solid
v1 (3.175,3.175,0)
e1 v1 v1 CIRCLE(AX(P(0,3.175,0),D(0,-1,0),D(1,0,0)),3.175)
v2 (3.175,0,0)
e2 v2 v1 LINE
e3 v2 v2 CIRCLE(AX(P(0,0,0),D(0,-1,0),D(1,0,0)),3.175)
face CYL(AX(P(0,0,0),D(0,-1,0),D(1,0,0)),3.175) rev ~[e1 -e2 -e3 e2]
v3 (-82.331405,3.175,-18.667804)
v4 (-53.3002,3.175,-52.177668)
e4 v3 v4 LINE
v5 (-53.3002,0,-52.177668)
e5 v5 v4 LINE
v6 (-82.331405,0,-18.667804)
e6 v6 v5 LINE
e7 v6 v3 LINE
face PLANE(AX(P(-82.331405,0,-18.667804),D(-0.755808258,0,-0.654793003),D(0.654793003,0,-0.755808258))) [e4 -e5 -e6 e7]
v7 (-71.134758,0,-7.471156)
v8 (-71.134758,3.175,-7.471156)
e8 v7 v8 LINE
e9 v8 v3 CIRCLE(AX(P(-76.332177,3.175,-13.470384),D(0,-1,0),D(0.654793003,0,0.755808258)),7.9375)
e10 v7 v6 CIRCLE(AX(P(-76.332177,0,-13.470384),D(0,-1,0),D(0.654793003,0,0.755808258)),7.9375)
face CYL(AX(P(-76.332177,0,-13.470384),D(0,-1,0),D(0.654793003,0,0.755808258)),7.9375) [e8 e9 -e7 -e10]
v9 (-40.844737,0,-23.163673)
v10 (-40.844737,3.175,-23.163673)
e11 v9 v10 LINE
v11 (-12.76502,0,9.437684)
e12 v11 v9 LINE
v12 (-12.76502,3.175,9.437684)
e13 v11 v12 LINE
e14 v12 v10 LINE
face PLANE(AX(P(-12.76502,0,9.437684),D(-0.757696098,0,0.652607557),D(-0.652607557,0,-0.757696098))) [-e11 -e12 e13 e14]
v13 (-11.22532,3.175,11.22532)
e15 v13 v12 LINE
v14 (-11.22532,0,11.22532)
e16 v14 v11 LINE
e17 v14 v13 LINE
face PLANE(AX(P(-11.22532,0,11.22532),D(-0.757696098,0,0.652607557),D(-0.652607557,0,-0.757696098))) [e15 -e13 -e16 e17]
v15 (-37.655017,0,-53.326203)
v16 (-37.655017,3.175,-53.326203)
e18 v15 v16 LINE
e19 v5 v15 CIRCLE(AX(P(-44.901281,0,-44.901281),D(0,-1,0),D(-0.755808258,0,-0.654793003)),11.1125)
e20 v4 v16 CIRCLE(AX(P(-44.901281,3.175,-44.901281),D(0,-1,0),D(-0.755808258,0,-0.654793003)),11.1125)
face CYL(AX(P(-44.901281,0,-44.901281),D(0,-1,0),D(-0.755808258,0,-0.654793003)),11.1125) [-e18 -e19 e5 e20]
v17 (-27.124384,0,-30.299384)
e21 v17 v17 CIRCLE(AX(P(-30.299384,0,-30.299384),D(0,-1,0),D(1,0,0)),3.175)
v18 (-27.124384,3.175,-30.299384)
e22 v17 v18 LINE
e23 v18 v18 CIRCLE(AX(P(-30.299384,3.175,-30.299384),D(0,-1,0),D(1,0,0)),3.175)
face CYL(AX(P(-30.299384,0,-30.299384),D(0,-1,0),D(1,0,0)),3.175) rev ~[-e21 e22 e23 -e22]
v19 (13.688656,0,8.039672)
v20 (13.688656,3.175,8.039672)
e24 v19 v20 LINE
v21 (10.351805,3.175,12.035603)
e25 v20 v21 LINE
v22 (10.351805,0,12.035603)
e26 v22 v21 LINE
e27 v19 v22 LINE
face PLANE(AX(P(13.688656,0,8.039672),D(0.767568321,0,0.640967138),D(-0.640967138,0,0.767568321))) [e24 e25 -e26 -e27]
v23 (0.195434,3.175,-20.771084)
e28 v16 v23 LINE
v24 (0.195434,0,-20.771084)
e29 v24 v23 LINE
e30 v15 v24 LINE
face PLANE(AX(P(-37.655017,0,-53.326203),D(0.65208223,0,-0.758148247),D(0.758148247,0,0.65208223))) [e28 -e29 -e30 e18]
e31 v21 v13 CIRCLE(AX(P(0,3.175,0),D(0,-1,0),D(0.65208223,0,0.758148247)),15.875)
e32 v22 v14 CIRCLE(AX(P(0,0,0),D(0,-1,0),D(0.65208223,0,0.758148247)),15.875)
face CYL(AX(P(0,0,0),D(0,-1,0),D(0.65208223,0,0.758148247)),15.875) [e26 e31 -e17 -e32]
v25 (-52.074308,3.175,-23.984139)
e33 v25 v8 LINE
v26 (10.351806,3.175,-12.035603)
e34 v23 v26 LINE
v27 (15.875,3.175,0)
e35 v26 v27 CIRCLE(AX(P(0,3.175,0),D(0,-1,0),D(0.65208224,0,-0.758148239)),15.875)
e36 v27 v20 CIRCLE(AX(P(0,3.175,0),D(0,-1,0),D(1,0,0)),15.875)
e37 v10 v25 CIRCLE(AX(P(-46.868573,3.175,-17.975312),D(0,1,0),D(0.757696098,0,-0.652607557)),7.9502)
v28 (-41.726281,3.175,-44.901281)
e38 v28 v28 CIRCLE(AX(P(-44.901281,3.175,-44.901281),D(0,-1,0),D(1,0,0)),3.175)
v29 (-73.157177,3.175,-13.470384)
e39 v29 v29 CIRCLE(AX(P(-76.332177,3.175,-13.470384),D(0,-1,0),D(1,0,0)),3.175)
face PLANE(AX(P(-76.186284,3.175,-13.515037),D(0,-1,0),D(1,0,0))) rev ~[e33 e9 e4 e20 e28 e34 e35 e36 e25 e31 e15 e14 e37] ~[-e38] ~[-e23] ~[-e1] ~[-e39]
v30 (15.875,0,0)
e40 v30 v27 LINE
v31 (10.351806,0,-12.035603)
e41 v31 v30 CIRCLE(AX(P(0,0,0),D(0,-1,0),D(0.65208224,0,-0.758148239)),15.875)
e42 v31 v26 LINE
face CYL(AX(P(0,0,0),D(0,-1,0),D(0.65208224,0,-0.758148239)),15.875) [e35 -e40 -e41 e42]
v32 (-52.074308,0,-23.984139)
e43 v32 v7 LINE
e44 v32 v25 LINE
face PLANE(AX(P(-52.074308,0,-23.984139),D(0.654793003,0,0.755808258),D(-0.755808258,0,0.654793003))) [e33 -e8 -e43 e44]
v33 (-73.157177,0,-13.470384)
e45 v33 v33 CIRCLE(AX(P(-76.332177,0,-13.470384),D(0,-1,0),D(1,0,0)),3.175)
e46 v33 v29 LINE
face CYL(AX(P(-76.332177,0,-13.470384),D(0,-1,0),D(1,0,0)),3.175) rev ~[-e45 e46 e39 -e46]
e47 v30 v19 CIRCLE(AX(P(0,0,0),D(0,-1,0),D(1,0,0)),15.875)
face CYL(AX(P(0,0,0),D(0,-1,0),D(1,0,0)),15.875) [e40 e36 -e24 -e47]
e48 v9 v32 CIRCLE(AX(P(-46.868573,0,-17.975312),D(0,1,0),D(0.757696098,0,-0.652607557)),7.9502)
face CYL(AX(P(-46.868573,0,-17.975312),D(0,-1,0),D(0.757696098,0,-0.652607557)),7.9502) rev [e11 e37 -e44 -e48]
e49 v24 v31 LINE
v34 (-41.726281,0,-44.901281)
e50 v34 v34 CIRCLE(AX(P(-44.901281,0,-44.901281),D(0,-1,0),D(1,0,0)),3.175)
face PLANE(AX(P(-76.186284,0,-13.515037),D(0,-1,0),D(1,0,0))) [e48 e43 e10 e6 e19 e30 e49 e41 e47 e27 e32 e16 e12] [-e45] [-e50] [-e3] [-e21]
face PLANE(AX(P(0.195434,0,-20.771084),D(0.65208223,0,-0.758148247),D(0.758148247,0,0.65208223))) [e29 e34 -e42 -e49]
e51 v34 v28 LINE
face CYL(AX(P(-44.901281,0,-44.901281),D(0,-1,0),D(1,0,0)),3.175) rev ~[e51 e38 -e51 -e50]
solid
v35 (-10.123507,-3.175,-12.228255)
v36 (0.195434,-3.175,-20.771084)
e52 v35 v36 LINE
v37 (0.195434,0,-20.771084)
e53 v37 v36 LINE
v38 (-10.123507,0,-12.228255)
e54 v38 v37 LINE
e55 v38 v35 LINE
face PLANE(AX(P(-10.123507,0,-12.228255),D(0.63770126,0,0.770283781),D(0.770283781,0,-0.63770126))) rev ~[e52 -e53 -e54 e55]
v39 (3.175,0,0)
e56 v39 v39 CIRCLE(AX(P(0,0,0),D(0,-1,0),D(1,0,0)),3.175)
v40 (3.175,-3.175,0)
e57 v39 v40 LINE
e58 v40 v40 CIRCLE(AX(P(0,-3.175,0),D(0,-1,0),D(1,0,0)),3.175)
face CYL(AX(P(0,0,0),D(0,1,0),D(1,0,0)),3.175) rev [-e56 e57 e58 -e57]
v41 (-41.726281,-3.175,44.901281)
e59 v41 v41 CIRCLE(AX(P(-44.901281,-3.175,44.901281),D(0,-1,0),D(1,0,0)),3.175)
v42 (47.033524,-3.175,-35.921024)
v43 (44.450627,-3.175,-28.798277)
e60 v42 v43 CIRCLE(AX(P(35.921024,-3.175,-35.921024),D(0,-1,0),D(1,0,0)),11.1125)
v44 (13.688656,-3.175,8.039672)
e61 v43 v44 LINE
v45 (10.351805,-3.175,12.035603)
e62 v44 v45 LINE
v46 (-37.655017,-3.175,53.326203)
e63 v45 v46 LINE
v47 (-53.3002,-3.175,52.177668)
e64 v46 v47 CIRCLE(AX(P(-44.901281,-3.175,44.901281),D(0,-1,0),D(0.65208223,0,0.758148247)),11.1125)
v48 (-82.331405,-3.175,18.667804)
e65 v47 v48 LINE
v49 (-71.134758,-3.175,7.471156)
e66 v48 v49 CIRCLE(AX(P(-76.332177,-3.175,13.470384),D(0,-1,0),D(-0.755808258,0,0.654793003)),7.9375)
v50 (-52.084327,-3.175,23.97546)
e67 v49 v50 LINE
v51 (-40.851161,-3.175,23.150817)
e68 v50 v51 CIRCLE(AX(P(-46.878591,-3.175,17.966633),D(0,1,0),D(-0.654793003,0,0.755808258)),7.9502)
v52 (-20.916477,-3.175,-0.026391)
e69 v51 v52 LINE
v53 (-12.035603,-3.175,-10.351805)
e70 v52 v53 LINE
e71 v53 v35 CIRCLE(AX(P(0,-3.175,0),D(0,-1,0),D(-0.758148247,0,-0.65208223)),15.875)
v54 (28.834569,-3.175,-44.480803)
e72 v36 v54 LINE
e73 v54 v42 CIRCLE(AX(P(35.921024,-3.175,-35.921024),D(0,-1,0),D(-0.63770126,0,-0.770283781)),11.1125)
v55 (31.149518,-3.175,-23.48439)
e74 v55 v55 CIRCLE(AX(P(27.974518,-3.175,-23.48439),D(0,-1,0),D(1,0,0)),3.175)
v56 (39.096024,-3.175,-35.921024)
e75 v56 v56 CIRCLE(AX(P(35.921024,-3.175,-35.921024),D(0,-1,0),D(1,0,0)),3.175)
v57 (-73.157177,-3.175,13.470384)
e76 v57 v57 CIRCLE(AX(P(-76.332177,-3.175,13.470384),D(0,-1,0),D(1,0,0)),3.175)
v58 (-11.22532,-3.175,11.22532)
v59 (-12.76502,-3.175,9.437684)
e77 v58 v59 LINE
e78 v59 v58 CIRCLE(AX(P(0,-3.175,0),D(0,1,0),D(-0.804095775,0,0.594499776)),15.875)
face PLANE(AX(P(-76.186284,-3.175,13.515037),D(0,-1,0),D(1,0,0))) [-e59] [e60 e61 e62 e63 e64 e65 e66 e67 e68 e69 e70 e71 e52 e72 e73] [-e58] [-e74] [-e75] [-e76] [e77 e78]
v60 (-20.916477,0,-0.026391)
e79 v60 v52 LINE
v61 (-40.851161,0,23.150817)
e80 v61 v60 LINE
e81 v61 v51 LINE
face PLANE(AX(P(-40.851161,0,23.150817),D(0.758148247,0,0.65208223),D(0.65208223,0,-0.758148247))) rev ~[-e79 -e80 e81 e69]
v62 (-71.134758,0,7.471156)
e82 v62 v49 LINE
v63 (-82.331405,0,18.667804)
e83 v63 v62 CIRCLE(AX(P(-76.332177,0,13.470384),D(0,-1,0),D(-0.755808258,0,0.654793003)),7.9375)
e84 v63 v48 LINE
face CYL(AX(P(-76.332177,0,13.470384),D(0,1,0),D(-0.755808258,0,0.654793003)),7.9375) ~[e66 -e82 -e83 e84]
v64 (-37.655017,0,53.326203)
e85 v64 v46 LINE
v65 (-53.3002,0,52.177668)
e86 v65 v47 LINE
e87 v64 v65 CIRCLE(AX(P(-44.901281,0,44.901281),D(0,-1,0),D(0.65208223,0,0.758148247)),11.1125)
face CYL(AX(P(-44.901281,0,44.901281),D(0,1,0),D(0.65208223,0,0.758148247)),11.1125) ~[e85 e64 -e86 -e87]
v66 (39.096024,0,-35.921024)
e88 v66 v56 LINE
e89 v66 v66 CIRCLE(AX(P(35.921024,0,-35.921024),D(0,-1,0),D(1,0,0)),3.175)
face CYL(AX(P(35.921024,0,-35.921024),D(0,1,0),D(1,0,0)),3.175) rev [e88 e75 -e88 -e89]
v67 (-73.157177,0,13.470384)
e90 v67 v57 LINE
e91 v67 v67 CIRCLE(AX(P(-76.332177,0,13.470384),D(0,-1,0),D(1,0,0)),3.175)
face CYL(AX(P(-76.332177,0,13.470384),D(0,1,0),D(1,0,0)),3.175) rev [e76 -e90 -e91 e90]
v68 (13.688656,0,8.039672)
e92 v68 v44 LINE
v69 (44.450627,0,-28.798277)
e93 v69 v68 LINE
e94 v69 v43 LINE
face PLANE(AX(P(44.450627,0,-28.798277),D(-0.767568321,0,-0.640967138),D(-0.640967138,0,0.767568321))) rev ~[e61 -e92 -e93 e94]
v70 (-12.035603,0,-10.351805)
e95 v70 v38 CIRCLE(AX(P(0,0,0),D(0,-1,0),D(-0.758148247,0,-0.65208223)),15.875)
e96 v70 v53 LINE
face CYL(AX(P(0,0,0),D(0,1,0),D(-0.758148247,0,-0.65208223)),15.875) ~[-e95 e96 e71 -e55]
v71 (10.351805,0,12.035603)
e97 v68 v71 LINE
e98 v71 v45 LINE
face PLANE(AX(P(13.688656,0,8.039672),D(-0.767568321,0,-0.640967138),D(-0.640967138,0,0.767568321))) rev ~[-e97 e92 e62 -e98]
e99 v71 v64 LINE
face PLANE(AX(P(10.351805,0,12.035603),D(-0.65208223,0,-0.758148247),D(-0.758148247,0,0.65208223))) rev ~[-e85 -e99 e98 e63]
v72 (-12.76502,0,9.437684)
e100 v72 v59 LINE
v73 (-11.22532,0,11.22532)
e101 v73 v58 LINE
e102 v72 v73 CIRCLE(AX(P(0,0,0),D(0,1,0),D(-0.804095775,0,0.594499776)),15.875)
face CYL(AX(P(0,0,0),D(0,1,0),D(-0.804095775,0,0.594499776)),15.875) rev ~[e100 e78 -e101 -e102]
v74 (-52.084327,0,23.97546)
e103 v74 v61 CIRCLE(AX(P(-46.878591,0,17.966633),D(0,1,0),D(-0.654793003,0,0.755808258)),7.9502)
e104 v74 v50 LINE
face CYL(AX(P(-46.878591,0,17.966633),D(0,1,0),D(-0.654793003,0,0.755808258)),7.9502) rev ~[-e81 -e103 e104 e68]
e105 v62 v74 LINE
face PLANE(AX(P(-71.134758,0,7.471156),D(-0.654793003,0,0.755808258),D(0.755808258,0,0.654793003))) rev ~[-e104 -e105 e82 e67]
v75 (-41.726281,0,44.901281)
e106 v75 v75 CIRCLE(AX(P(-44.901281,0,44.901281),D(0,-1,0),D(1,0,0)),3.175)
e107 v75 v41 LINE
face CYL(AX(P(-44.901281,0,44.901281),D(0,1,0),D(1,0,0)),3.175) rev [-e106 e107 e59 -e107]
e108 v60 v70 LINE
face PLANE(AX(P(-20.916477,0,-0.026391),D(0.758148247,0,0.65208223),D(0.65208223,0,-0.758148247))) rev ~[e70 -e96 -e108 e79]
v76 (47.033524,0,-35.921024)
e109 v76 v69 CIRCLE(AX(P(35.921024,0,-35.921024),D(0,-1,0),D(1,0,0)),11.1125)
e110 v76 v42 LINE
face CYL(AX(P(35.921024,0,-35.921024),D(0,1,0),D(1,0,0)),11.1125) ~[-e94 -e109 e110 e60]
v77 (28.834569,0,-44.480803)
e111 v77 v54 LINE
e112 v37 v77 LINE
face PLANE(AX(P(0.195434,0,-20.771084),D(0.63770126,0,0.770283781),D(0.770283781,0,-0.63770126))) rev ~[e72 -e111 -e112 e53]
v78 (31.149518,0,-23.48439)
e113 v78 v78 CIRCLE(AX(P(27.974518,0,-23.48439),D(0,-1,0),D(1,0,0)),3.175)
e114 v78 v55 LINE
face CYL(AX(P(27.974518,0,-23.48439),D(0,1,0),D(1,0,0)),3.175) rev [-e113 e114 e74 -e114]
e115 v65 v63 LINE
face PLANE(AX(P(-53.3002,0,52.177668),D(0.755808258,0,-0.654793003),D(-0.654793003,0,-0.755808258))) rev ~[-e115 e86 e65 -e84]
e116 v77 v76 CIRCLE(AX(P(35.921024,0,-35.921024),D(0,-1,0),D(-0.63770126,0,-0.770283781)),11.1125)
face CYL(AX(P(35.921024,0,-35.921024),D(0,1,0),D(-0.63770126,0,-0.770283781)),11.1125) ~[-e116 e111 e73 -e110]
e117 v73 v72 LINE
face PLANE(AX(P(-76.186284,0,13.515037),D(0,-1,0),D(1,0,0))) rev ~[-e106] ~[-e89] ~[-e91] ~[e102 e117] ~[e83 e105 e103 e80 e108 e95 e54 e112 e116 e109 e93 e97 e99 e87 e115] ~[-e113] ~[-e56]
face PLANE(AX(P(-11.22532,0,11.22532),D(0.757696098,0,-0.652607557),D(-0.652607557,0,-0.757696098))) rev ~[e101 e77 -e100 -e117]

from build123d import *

# Parameters (mm, degrees)
F0_R     = 3.175
F0_R_2   = 3.9751
F1_DEPTH = 3.175
F2_DEPTH = 3.175


# Not quite as in the source:
# - a feature names something its author has since deleted; it is built from what else it names


with BuildPart() as f1:
    # F0 (on Front) → F1 (new body)
    with BuildSketch(Plane.XZ):
        with BuildLine():
            ThreePointArc((-71.1347575644, 7.4711561347), (-69.1121208226, 10.1727039932), (-68.3946770291, 13.4703841816))
            ThreePointArc((-68.3946770291, 13.4703841816), (-73.5586383483, 20.9075469092), (-82.331405076, 18.6678036462))
            ThreePointArc((-82.331405076, 18.6678036462), (-81.9448371048, 7.8577241059), (-71.1347575644, 7.4711561347))
        make_face()
        with Locations((-76.3321770291, 13.4703841816)):
            Circle(F0_R, mode=Mode.SUBTRACT)
        with BuildLine():
            ThreePointArc((-82.331405076, 18.6678036462), (-73.5586383483, 20.9075469092), (-68.3946770291, 13.4703841816))
            ThreePointArc((-68.3946770291, 13.4703841816), (-69.1121208226, 10.1727039932), (-71.1347575644, 7.4711561347))
            Line((-71.1347575644, 7.4711561347), (-52.0843267669, 23.9754595323))
            ThreePointArc((-52.0843267669, 23.9754595323), (-46.2965222838, 25.8954961667), (-40.8511612346, 23.1508168672))
            Line((-40.8511612346, 23.1508168672), (-20.9164773453, -0.0263913939))
            Line((-20.9164773453, -0.0263913939), (-12.7650204358, 9.4376839465))
            ThreePointArc((-12.7650204358, 9.4376839465), (-12.0284255483, 10.3601449714), (-11.2253201513, 11.2253201513))
            ThreePointArc((-11.2253201513, 11.2253201513), (-0.5957321126, 15.8638182116), (10.3518054047, 12.0356034274))
            Line((10.3518054047, 12.0356034274), (-37.655016822, 53.3262030046))
            ThreePointArc((-37.655016822, 53.3262030046), (-34.8014845049, 49.5361241819), (-33.7887806053, 44.9012806053))
            ThreePointArc((-33.7887806053, 44.9012806053), (-48.7842347585, 34.4892527868), (-53.300199871, 52.1776678558))
            Line((-53.300199871, 52.1776678558), (-82.331405076, 18.6678036462))
        make_face()
        with BuildLine():
            ThreePointArc((-37.655016822, 53.3262030046), (-45.7148756595, 55.9839571475), (-53.300199871, 52.1776678558))
            ThreePointArc((-53.300199871, 52.1776678558), (-48.7842347585, 34.4892527868), (-33.7887806053, 44.9012806053))
            ThreePointArc((-33.7887806053, 44.9012806053), (-34.8014845049, 49.5361241819), (-37.655016822, 53.3262030046))
        make_face()
        with Locations((-44.9012806053, 44.9012806053)):
            Circle(F0_R, mode=Mode.SUBTRACT)
        with BuildLine():
            Line((13.6886557503, 8.0396721793), (10.3518054047, 12.0356034274))
            ThreePointArc((10.3518054047, 12.0356034274), (-0.5957321126, 15.8638182116), (-11.2253201513, 11.2253201513))
            Line((-11.2253201513, 11.2253201513), (-12.7650204358, 9.4376839465))
            ThreePointArc((-12.7650204358, 9.4376839465), (-15.8642273117, -0.5847365245), (-12.0356034274, -10.3518054047))
            ThreePointArc((-12.0356034274, -10.3518054047), (-11.1192092809, -11.3304373246), (-10.1235074968, -12.2282550252))
            ThreePointArc((-10.1235074968, -12.2282550252), (0.1493608834, -15.8742973491), (10.3518055584, -12.0356032953))
            ThreePointArc((10.3518055584, -12.0356032953), (14.4282801858, -6.6212050173), (15.875, 0))
            ThreePointArc((15.875, 0), (15.3186656572, 4.1658261464), (13.6886557503, 8.0396721793))
        make_face()
        Circle(F0_R_2, mode=Mode.SUBTRACT)
        with BuildLine():
            Line((-12.7650204358, 9.4376839465), (-20.9164773453, -0.0263913939))
            Line((-20.9164773453, -0.0263913939), (-12.0356034274, -10.3518054047))
            ThreePointArc((-12.0356034274, -10.3518054047), (-15.8642273117, -0.5847365245), (-12.7650204358, 9.4376839465))
        make_face()
        with BuildLine():
            Line((44.4506274521, -28.7982771588), (13.6886557503, 8.0396721793))
            ThreePointArc((13.6886557503, 8.0396721793), (15.3186656572, 4.1658261464), (15.875, 0))
            ThreePointArc((15.875, 0), (14.4282801858, -6.6212050173), (10.3518055584, -12.0356032953))
            Line((10.3518055584, -12.0356032953), (0.1954344954, -20.7710836138))
            Line((0.1954344954, -20.7710836138), (28.8345692365, -44.4808030019))
            ThreePointArc((28.8345692365, -44.4808030019), (28.0466309813, -28.0800052132), (44.4506274521, -28.7982771588))
        make_face()
        with Locations((27.9745180668, -23.4843900063)):
            Circle(F0_R, mode=Mode.SUBTRACT)
        with BuildLine():
            ThreePointArc((47.0335244843, -35.9210244843), (46.3678629828, -32.132723858), (44.4506274521, -28.7982771588))
            ThreePointArc((44.4506274521, -28.7982771588), (28.0466309813, -28.0800052132), (28.8345692365, -44.4808030019))
            ThreePointArc((28.8345692365, -44.4808030019), (40.650687385, -45.9767663811), (47.0335244843, -35.9210244843))
        make_face()
        with Locations((35.9210244843, -35.9210244843)):
            Circle(F0_R, mode=Mode.SUBTRACT)
        with BuildLine():
            ThreePointArc((10.3518055584, -12.0356032953), (0.1493608834, -15.8742973491), (-10.1235074968, -12.2282550252))
            Line((-10.1235074968, -12.2282550252), (0.1954344954, -20.7710836138))
            Line((0.1954344954, -20.7710836138), (10.3518055584, -12.0356032953))
        make_face()
        Circle(F0_R_2)
        Circle(F0_R, mode=Mode.SUBTRACT)
    extrude(amount=F1_DEPTH)


with BuildPart() as f2:
    # F0 (on Front) → F2 (new body)
    with BuildSketch(Plane.XZ):
        with BuildLine():
            ThreePointArc((-68.3946770291, -13.4703841816), (-69.1121208226, -10.1727039932), (-71.1347575644, -7.4711561347))
            ThreePointArc((-71.1347575644, -7.4711561347), (-81.9448371048, -7.8577241059), (-82.331405076, -18.6678036462))
            ThreePointArc((-82.331405076, -18.6678036462), (-73.5586383483, -20.9075469092), (-68.3946770291, -13.4703841816))
        make_face()
        with Locations((-76.3321770291, -13.4703841816)):
            Circle(F0_R, mode=Mode.SUBTRACT)
        with BuildLine():
            Line((-12.0356034274, -10.3518054047), (-20.9164773453, -0.0263913939))
            Line((-20.9164773453, -0.0263913939), (-40.8447372902, -23.1636729395))
            ThreePointArc((-40.8447372902, -23.1636729395), (-46.2892514984, -25.9043770281), (-52.0743081406, -23.9841391495))
            Line((-52.0743081406, -23.9841391495), (-71.1347575644, -7.4711561347))
            ThreePointArc((-71.1347575644, -7.4711561347), (-69.1121208226, -10.1727039932), (-68.3946770291, -13.4703841816))
            ThreePointArc((-68.3946770291, -13.4703841816), (-73.5586383483, -20.9075469092), (-82.331405076, -18.6678036462))
            Line((-82.331405076, -18.6678036462), (-53.300199871, -52.1776678558))
            ThreePointArc((-53.300199871, -52.1776678558), (-48.7842347585, -34.4892527868), (-33.7887806053, -44.9012806053))
            ThreePointArc((-33.7887806053, -44.9012806053), (-34.8014845049, -49.5361241819), (-37.655016822, -53.3262030046))
            Line((-37.655016822, -53.3262030046), (0.1954344954, -20.7710836138))
            Line((0.1954344954, -20.7710836138), (-10.1235074968, -12.2282550252))
            ThreePointArc((-10.1235074968, -12.2282550252), (-11.1192092809, -11.3304373246), (-12.0356034274, -10.3518054047))
        make_face()
        with Locations((-30.2993841525, -30.2993841525)):
            Circle(F0_R, mode=Mode.SUBTRACT)
        with BuildLine():
            ThreePointArc((-53.300199871, -52.1776678558), (-45.7148756595, -55.9839571475), (-37.655016822, -53.3262030046))
            ThreePointArc((-37.655016822, -53.3262030046), (-34.8014845049, -49.5361241819), (-33.7887806053, -44.9012806053))
            ThreePointArc((-33.7887806053, -44.9012806053), (-48.7842347585, -34.4892527868), (-53.300199871, -52.1776678558))
        make_face()
        with Locations((-44.9012806053, -44.9012806053)):
            Circle(F0_R, mode=Mode.SUBTRACT)
        with BuildLine():
            ThreePointArc((10.3518055584, -12.0356032953), (0.1493608834, -15.8742973491), (-10.1235074968, -12.2282550252))
            Line((-10.1235074968, -12.2282550252), (0.1954344954, -20.7710836138))
            Line((0.1954344954, -20.7710836138), (10.3518055584, -12.0356032953))
        make_face()
        with BuildLine():
            Line((-12.7650204358, 9.4376839465), (-20.9164773453, -0.0263913939))
            Line((-20.9164773453, -0.0263913939), (-12.0356034274, -10.3518054047))
            ThreePointArc((-12.0356034274, -10.3518054047), (-15.8642273117, -0.5847365245), (-12.7650204358, 9.4376839465))
        make_face()
        with BuildLine():
            Line((13.6886557503, 8.0396721793), (10.3518054047, 12.0356034274))
            ThreePointArc((10.3518054047, 12.0356034274), (-0.5957321126, 15.8638182116), (-11.2253201513, 11.2253201513))
            Line((-11.2253201513, 11.2253201513), (-12.7650204358, 9.4376839465))
            ThreePointArc((-12.7650204358, 9.4376839465), (-15.8642273117, -0.5847365245), (-12.0356034274, -10.3518054047))
            ThreePointArc((-12.0356034274, -10.3518054047), (-11.1192092809, -11.3304373246), (-10.1235074968, -12.2282550252))
            ThreePointArc((-10.1235074968, -12.2282550252), (0.1493608834, -15.8742973491), (10.3518055584, -12.0356032953))
            ThreePointArc((10.3518055584, -12.0356032953), (14.4282801858, -6.6212050173), (15.875, 0))
            ThreePointArc((15.875, 0), (15.3186656572, 4.1658261464), (13.6886557503, 8.0396721793))
        make_face()
        Circle(F0_R_2, mode=Mode.SUBTRACT)
        Circle(F0_R_2)
        Circle(F0_R, mode=Mode.SUBTRACT)
    extrude(amount=-F2_DEPTH)


solid = Compound([f1.part, f2.part])
